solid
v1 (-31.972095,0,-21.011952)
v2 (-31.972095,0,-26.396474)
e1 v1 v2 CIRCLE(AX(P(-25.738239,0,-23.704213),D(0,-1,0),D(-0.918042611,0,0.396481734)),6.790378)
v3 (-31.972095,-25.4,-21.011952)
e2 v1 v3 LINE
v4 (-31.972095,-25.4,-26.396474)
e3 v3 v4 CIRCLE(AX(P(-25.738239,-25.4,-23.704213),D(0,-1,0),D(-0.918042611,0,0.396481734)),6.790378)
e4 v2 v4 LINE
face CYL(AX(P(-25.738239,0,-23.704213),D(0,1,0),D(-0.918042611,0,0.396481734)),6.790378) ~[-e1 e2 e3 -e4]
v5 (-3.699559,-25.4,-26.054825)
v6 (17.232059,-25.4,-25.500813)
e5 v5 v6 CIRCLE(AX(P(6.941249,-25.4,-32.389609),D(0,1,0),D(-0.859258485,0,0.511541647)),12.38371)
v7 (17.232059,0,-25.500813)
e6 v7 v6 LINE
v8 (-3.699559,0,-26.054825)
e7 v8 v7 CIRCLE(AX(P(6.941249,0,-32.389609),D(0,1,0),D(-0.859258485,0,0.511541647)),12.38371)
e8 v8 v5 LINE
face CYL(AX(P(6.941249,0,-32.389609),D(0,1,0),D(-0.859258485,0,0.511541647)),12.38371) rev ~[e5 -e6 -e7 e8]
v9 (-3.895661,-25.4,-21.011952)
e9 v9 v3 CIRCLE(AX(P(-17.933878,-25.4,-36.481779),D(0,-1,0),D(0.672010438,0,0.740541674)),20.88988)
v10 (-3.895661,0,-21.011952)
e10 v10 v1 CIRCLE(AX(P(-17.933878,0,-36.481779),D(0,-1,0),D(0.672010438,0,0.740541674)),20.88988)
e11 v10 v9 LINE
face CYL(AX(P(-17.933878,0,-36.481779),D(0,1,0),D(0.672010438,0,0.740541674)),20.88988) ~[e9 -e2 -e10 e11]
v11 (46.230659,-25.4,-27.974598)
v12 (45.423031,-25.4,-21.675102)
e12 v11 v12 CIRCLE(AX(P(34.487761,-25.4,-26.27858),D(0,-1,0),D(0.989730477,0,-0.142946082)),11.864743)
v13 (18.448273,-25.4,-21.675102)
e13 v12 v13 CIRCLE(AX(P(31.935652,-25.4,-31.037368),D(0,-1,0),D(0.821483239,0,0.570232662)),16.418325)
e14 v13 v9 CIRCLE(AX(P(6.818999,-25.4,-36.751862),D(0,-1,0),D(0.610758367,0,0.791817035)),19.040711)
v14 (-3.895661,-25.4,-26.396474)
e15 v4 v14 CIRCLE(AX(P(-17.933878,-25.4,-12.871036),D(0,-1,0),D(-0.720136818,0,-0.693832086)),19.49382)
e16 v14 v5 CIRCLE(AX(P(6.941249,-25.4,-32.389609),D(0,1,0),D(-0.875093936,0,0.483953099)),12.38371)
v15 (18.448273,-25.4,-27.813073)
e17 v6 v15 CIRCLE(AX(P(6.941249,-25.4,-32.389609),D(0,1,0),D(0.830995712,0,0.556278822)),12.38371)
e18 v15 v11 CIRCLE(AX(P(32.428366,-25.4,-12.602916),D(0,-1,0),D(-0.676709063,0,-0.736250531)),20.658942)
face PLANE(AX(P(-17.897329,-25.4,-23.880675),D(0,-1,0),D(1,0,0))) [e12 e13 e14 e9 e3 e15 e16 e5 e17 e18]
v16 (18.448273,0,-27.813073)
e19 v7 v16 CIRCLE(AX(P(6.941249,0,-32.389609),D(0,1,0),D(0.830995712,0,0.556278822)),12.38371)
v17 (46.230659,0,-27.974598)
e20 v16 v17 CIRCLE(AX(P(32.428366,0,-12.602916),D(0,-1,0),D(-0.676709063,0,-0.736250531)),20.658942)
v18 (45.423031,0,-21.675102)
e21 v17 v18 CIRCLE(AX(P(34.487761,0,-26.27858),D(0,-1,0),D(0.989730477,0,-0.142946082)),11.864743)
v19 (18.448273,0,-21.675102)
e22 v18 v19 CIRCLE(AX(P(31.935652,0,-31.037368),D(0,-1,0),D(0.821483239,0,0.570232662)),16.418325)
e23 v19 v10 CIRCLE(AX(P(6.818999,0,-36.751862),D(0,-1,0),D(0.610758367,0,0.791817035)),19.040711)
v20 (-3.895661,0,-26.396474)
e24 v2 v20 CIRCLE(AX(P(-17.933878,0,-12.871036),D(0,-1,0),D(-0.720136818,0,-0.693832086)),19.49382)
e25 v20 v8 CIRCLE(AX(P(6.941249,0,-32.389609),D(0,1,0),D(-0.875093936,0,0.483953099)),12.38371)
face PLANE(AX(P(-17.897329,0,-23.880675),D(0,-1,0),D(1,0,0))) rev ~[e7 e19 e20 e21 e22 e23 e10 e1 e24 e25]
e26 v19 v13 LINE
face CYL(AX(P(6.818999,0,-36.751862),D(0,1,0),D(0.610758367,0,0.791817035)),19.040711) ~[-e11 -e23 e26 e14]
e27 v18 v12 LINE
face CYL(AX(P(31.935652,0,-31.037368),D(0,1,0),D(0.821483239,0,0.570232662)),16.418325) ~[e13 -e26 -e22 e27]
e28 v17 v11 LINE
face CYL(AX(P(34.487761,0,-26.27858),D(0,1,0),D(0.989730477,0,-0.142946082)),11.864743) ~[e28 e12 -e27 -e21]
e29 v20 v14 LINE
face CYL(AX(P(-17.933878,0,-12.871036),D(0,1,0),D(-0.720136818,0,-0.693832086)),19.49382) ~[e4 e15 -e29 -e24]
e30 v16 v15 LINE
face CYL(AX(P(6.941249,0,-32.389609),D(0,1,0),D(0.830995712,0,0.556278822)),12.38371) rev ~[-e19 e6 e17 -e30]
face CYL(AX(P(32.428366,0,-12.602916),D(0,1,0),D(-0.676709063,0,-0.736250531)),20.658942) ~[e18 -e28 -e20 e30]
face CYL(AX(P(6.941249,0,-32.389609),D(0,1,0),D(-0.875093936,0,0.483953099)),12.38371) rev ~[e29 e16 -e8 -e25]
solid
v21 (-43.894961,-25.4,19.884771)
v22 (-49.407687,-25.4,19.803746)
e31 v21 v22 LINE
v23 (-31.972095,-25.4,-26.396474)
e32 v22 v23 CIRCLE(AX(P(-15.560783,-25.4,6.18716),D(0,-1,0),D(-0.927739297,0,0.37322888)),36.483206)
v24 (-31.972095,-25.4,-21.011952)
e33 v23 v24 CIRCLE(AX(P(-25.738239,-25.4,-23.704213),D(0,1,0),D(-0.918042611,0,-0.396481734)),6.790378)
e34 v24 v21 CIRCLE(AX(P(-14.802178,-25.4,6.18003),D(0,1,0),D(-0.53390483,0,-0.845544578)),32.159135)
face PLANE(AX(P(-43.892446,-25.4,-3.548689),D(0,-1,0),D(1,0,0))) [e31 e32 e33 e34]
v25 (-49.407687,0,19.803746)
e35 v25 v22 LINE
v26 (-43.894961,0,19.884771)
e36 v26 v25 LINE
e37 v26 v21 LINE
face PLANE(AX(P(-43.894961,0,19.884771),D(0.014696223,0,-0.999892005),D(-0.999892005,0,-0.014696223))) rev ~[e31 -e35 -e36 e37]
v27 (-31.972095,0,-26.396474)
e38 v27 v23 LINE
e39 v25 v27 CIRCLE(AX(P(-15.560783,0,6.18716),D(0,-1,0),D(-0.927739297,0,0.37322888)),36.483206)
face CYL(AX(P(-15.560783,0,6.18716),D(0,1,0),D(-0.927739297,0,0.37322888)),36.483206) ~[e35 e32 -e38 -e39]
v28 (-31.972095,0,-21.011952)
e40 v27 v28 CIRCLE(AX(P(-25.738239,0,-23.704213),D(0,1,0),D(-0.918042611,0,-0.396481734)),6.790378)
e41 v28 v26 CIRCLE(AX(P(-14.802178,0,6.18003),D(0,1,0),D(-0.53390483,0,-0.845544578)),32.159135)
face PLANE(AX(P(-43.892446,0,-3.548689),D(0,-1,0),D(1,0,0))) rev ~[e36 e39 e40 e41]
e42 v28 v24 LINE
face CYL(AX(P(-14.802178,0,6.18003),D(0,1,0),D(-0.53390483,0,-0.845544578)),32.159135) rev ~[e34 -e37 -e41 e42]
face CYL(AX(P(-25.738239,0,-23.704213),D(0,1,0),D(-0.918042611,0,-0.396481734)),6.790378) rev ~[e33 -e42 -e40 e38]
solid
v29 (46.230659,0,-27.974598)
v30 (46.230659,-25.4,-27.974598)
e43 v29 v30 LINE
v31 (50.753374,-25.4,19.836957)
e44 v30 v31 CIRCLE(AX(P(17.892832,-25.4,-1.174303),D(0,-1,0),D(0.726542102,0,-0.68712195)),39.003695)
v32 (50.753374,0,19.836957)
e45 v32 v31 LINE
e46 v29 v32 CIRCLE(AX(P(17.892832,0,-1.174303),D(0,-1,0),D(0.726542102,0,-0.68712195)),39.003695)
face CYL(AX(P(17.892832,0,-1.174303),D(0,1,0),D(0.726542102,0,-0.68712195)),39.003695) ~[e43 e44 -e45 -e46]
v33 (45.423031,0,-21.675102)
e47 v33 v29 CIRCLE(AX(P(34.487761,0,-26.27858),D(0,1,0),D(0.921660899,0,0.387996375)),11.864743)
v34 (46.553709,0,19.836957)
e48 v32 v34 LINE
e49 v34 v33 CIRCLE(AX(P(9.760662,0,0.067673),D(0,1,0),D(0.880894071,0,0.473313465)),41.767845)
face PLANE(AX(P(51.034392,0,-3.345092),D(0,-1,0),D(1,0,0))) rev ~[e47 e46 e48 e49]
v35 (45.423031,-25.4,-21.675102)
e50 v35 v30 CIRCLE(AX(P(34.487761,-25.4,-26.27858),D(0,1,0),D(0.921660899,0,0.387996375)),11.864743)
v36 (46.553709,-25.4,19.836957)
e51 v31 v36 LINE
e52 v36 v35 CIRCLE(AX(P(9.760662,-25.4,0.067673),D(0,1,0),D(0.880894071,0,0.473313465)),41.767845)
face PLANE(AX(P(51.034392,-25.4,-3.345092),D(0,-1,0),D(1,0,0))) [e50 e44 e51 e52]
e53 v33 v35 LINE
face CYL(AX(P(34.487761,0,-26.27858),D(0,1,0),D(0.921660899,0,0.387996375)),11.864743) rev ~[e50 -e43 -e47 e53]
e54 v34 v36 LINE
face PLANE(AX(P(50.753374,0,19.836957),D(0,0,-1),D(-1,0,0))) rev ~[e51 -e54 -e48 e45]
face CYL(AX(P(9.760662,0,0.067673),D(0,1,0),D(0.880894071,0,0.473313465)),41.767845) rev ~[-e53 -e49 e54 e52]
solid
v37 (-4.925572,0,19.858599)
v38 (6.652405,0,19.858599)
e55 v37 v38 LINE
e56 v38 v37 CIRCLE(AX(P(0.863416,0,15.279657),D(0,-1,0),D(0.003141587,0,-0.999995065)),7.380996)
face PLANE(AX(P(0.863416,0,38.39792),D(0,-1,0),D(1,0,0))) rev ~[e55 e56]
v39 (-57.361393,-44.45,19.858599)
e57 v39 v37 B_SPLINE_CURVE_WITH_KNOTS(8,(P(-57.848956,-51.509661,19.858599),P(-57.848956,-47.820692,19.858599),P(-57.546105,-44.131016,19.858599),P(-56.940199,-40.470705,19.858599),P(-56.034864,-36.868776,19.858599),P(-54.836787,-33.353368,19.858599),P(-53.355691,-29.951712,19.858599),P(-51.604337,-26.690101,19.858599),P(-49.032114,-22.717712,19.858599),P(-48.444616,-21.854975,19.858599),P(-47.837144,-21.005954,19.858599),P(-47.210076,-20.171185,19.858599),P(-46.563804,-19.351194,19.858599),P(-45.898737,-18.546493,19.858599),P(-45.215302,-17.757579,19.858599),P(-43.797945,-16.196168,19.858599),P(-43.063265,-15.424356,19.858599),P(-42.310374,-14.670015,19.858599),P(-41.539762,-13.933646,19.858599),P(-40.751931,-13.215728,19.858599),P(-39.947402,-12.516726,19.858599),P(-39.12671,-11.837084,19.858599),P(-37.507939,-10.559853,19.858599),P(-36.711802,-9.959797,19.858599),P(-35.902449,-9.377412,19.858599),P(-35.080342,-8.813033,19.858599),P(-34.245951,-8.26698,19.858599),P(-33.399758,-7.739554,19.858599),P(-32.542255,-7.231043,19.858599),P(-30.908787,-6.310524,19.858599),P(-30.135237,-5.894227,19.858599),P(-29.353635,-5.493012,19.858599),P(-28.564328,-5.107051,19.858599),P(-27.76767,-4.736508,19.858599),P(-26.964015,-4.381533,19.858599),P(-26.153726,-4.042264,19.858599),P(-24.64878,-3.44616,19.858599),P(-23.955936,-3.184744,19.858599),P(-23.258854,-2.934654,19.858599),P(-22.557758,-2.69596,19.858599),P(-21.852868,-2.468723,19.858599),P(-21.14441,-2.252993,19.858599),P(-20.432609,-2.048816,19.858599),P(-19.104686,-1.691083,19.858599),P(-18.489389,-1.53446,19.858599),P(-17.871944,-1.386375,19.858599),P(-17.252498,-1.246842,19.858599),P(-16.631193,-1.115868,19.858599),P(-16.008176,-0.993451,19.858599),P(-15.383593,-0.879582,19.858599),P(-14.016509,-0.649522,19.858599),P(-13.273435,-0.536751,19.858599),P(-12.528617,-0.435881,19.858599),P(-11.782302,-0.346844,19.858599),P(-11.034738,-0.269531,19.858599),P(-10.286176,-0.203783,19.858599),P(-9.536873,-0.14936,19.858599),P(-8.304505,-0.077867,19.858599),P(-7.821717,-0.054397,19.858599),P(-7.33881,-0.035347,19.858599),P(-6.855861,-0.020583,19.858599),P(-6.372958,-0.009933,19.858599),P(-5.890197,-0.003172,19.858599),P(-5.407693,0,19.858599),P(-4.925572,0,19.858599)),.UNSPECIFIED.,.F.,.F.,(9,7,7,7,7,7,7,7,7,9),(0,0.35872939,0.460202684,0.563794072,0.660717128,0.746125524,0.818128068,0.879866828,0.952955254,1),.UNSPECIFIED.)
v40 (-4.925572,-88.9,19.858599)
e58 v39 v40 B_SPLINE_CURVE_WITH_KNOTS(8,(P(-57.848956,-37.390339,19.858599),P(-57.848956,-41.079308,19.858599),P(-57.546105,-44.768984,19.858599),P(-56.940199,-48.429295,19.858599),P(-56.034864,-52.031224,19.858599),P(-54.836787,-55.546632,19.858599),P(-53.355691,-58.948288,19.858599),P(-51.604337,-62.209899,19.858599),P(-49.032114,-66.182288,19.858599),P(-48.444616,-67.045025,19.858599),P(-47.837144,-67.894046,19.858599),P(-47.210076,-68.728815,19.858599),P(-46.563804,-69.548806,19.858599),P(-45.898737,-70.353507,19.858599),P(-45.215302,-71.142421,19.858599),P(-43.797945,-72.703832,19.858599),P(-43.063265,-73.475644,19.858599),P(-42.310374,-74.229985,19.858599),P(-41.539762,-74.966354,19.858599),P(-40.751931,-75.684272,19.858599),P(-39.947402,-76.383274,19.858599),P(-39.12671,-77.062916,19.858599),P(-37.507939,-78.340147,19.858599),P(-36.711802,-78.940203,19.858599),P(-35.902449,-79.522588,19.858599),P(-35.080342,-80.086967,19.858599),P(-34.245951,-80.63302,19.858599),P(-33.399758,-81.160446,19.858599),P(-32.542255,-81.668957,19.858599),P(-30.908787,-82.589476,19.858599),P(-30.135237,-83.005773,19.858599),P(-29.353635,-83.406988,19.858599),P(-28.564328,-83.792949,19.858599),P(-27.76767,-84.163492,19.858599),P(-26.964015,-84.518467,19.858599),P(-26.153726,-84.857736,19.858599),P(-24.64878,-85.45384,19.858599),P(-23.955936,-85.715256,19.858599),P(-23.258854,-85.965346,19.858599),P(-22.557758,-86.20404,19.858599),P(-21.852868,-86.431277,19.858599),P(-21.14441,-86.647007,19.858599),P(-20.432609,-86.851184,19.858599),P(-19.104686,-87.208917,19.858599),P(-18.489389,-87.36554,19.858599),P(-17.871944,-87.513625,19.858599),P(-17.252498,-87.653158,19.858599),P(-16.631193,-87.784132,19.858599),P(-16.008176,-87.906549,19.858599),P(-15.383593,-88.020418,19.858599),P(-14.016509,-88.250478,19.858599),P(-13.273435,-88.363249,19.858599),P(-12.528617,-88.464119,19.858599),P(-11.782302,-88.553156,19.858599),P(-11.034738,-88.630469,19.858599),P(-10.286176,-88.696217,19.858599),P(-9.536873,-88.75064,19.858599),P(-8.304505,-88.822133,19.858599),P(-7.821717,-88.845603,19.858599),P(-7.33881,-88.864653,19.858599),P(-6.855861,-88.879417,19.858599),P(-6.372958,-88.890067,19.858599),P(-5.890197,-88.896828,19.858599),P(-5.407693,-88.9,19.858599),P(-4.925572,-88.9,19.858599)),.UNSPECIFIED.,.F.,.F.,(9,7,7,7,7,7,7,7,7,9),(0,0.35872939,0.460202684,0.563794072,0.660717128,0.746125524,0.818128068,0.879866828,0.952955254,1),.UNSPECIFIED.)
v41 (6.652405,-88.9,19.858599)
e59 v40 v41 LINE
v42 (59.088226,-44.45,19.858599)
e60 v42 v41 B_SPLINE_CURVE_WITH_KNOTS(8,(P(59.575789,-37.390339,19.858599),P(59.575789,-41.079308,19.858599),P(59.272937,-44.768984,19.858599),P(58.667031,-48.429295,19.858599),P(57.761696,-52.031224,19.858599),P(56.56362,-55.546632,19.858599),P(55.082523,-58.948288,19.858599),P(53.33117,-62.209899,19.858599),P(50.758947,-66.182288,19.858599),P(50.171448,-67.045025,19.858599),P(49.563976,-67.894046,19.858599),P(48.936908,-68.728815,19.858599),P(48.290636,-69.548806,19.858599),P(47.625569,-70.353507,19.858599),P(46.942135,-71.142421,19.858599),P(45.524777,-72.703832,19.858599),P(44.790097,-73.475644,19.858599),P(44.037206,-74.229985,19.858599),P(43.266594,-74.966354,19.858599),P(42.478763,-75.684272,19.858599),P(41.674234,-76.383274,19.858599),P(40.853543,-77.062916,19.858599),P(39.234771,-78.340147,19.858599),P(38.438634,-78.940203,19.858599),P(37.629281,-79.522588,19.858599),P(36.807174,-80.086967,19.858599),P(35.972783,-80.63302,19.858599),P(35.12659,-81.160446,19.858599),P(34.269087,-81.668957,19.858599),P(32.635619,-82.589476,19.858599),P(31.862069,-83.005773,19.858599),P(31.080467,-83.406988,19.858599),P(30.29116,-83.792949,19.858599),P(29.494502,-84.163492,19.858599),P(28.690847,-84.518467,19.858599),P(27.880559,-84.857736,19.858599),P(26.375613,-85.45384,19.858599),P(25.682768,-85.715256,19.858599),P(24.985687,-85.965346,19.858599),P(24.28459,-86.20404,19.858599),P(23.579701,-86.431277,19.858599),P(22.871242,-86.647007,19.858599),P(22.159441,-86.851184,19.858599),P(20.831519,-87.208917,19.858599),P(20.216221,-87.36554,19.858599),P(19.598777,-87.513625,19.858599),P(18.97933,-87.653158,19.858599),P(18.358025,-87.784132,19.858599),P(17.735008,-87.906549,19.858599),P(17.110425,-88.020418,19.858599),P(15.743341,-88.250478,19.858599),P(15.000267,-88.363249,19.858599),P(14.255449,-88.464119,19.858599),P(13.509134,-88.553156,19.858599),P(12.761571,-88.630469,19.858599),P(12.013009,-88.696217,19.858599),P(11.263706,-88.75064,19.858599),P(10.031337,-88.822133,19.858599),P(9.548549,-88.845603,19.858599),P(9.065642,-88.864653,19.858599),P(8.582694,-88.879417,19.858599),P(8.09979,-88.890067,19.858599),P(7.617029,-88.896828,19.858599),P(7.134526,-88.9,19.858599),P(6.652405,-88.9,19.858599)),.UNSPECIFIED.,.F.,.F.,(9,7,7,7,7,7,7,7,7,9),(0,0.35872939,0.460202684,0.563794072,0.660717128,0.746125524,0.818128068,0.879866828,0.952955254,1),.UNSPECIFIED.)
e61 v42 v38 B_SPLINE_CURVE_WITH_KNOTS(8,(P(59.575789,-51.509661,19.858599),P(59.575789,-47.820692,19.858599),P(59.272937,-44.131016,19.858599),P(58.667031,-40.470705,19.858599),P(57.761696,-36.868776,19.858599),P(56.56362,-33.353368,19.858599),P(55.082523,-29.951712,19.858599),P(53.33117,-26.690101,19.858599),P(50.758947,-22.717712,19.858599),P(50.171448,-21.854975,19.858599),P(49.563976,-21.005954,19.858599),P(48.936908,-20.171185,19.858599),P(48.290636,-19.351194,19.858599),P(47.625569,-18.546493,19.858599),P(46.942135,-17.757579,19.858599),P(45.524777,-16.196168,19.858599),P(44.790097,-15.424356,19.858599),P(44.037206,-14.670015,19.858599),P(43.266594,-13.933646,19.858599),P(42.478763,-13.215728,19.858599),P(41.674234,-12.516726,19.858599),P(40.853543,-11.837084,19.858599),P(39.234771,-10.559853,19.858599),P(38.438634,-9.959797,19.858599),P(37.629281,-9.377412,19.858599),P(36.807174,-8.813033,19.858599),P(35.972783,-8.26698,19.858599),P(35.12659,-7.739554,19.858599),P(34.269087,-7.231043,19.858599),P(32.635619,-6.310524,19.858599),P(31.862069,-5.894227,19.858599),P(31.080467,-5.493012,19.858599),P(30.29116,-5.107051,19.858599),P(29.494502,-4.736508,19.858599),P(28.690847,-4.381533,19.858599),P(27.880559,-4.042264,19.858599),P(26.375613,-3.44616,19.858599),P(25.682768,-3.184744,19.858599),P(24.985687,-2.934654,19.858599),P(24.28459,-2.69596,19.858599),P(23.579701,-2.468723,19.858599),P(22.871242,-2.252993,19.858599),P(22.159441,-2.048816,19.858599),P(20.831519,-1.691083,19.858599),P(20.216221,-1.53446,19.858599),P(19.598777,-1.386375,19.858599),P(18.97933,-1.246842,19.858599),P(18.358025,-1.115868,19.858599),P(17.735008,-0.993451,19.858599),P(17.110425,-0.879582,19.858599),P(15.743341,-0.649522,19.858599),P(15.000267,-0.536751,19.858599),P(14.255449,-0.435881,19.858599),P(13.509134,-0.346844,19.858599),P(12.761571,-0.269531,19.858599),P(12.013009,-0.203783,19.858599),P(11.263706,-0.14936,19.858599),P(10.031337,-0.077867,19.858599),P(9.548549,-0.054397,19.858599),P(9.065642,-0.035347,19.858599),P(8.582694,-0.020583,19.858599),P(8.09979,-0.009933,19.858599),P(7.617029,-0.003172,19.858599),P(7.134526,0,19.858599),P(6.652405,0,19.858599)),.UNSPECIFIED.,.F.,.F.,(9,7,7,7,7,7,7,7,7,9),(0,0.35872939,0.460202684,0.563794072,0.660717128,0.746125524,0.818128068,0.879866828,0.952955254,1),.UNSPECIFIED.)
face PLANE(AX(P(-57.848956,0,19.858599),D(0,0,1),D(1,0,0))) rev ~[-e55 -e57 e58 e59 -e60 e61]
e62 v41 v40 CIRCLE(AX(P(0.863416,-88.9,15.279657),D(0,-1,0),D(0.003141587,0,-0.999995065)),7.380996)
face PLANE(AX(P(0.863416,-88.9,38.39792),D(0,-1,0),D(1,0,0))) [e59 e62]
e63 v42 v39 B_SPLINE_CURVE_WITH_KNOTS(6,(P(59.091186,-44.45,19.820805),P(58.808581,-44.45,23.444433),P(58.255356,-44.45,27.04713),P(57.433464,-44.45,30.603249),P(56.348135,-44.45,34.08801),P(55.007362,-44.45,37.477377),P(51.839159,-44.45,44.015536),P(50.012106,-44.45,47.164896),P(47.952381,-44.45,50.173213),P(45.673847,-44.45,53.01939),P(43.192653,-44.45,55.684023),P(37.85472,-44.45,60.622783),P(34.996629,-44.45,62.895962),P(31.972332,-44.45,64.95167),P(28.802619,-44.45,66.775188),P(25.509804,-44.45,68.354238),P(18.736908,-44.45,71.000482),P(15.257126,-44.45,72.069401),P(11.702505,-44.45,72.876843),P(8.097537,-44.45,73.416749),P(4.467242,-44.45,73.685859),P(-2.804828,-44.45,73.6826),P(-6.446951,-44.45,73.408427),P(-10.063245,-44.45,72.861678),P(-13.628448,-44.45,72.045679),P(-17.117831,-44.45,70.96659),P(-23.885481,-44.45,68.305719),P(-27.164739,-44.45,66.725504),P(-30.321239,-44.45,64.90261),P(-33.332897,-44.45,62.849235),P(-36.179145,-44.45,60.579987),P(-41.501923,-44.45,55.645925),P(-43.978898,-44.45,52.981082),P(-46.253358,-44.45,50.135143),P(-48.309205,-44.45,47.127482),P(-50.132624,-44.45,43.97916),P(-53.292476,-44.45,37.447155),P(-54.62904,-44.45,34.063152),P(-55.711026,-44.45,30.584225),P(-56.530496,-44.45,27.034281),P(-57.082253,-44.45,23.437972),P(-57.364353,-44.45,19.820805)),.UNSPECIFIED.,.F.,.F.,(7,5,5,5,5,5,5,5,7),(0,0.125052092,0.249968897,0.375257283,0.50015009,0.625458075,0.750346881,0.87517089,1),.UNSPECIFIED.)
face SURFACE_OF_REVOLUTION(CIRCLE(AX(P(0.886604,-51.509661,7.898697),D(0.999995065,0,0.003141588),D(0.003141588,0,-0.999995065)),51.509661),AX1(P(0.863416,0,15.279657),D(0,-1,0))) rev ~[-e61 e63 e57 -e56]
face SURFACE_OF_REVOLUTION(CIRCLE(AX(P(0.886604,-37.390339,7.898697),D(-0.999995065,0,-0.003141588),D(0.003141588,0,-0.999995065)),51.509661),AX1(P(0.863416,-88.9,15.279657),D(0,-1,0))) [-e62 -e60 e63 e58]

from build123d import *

# Parameters (mm, degrees)
F1_DEPTH    = 88.9
F2_T2_ANGLE = 359.64
F2_T4_ANGLE = 359.64
F4_DEPTH    = 25.4
F5_DEPTH    = 25.4


# Not quite as in the source:
# - a fillet or chamfer that OpenCascade refuses, or shapes differently, is made with other operations: its cross-section is extruded or revolved along the edge and cut away or added


with BuildPart() as f1:
    # F0 (on Front) → F1 (new body)
    with BuildSketch(Plane.XZ):
        with BuildLine():
            ThreePointArc((59.5757886767, 19.8585987091), (0.8634161204, 74.170312897), (-57.8489564359, 19.8585987091))
            Line((-57.8489564359, 19.8585987091), (59.5757886767, 19.8585987091))
        make_face()
    extrude(amount=F1_DEPTH)

    # F2: fillet of radius 51.5096605668 on 2 edges, made by hand

    # F2_s1 → F2_t2 (revolve, cut)
    with BuildSketch(Plane(origin=(0.9114097399, 0, 0.0028632876), x_dir=(0, 1, 0), z_dir=(-0.9999950652, 0, -0.0031415875))):
        with BuildLine():
            ThreePointArc((-37.3903394332, 43.6137876504), (-73.8131697166, 28.526957367), (-88.9, -7.8958729164))
            Line((-88.9, -7.8958729164), (-88.9, 43.6137876504))
            Line((-88.9, 43.6137876504), (-37.3903394332, 43.6137876504))
        make_face()
    revolve(axis=Axis((0.8634161204, -88.9, 15.2796565729), (0, -1, 0)), revolution_arc=F2_T2_ANGLE, mode=Mode.SUBTRACT)

    # F2_s3 → F2_t4 (revolve, cut)
    with BuildSketch(Plane(origin=(0.9114097399, 0, 0.0028632876), x_dir=(0, 1, 0), z_dir=(-0.9999950652, 0, -0.0031415875))):
        with BuildLine():
            ThreePointArc((-51.5096605668, 43.6137876504), (-15.0868302834, 28.526957367), (0, -7.8958729164))
            Line((0, -7.8958729164), (0, 43.6137876504))
            Line((0, 43.6137876504), (-51.5096605668, 43.6137876504))
        make_face()
    revolve(axis=Axis((0.8634161204, 0, 15.2796565729), (0, -1, 0)), revolution_arc=F2_T4_ANGLE, mode=Mode.SUBTRACT)


with BuildPart() as f4:
    # F3 (on Front) → F4 (new body)
    with BuildSketch(Plane.XZ):
        with BuildLine():
            ThreePointArc((-31.9720953703, -21.0119523108), (-32.5286170117, -23.7042130902), (-31.9720953703, -26.3964738697))
            ThreePointArc((-31.9720953703, -26.3964738697), (-17.9338779999, -32.3648560237), (-3.8956606295, -26.3964738697))
            ThreePointArc((-3.8956606295, -26.3964738697), (-3.7989683826, -26.2248697788), (-3.6995589857, -26.0548252952))
            ThreePointArc((-3.6995589857, -26.0548252952), (-3.1254057527, -23.5072488783), (-3.8956606295, -21.0119523108))
            ThreePointArc((-3.8956606295, -21.0119523108), (-17.9338779999, -15.5918990312), (-31.9720953703, -21.0119523108))
        make_face()
        with BuildLine():
            ThreePointArc((18.44827272, -21.6751024127), (17.3677793216, -23.437783574), (17.2320588287, -25.5008130959))
            ThreePointArc((17.2320588287, -25.5008130959), (17.9013139449, -26.6247801583), (18.44827272, -27.8130732477))
            ThreePointArc((18.44827272, -27.8130732477), (32.308258524, -33.2615091406), (46.2306588888, -27.9745981097))
            ThreePointArc((46.2306588888, -27.9745981097), (46.2561820848, -24.7698070026), (45.4230308533, -21.6751024127))
            ThreePointArc((45.4230308533, -21.6751024127), (31.9356517866, -14.6190424345), (18.44827272, -21.6751024127))
        make_face()
        with BuildLine():
            ThreePointArc((-3.8956606295, -21.0119523108), (-3.1254057527, -23.5072488783), (-3.6995589857, -26.0548252952))
            ThreePointArc((-3.6995589857, -26.0548252952), (6.6135950932, -20.0102340616), (17.2320588287, -25.5008130959))
            ThreePointArc((17.2320588287, -25.5008130959), (17.3677793216, -23.437783574), (18.44827272, -21.6751024127))
            ThreePointArc((18.44827272, -21.6751024127), (7.383863358, -17.7195311955), (-3.8956606295, -21.0119523108))
        make_face()
    extrude(amount=F4_DEPTH)


with BuildPart() as f5:
    # F3 (on Front) → F5 (new body)
    with BuildSketch(Plane.XZ):
        with BuildLine():
            Line((-43.8949614763, 19.8847707361), (-49.4076870382, 19.8037457436))
            ThreePointArc((-49.4076870382, 19.8037457436), (-49.694155963, -6.6945012346), (-31.9720953703, -26.3964738697))
            ThreePointArc((-31.9720953703, -26.3964738697), (-32.5286170117, -23.7042130902), (-31.9720953703, -21.0119523108))
            ThreePointArc((-31.9720953703, -21.0119523108), (-45.6760319405, -2.820809114), (-43.8949614763, 19.8847707361))
        make_face()
    extrude(amount=F5_DEPTH)


with BuildPart() as f5b:
    # F3 (on Front) → F5, piece 2 (new body)
    with BuildSketch(Plane.XZ):
        with BuildLine():
            ThreePointArc((46.5537086129, 19.8369566351), (51.5130220007, -1.0695496802), (45.4230308533, -21.6751024127))
            ThreePointArc((45.4230308533, -21.6751024127), (46.2561820848, -24.7698070026), (46.2306588888, -27.9745981097))
            ThreePointArc((46.2306588888, -27.9745981097), (56.7231845264, -4.8474447832), (50.7533736527, 19.8369566351))
            Line((50.7533736527, 19.8369566351), (46.5537086129, 19.8369566351))
        make_face()
    extrude(amount=F5_DEPTH)


solid = Compound([f1.part, f4.part, f5.part, f5b.part])
